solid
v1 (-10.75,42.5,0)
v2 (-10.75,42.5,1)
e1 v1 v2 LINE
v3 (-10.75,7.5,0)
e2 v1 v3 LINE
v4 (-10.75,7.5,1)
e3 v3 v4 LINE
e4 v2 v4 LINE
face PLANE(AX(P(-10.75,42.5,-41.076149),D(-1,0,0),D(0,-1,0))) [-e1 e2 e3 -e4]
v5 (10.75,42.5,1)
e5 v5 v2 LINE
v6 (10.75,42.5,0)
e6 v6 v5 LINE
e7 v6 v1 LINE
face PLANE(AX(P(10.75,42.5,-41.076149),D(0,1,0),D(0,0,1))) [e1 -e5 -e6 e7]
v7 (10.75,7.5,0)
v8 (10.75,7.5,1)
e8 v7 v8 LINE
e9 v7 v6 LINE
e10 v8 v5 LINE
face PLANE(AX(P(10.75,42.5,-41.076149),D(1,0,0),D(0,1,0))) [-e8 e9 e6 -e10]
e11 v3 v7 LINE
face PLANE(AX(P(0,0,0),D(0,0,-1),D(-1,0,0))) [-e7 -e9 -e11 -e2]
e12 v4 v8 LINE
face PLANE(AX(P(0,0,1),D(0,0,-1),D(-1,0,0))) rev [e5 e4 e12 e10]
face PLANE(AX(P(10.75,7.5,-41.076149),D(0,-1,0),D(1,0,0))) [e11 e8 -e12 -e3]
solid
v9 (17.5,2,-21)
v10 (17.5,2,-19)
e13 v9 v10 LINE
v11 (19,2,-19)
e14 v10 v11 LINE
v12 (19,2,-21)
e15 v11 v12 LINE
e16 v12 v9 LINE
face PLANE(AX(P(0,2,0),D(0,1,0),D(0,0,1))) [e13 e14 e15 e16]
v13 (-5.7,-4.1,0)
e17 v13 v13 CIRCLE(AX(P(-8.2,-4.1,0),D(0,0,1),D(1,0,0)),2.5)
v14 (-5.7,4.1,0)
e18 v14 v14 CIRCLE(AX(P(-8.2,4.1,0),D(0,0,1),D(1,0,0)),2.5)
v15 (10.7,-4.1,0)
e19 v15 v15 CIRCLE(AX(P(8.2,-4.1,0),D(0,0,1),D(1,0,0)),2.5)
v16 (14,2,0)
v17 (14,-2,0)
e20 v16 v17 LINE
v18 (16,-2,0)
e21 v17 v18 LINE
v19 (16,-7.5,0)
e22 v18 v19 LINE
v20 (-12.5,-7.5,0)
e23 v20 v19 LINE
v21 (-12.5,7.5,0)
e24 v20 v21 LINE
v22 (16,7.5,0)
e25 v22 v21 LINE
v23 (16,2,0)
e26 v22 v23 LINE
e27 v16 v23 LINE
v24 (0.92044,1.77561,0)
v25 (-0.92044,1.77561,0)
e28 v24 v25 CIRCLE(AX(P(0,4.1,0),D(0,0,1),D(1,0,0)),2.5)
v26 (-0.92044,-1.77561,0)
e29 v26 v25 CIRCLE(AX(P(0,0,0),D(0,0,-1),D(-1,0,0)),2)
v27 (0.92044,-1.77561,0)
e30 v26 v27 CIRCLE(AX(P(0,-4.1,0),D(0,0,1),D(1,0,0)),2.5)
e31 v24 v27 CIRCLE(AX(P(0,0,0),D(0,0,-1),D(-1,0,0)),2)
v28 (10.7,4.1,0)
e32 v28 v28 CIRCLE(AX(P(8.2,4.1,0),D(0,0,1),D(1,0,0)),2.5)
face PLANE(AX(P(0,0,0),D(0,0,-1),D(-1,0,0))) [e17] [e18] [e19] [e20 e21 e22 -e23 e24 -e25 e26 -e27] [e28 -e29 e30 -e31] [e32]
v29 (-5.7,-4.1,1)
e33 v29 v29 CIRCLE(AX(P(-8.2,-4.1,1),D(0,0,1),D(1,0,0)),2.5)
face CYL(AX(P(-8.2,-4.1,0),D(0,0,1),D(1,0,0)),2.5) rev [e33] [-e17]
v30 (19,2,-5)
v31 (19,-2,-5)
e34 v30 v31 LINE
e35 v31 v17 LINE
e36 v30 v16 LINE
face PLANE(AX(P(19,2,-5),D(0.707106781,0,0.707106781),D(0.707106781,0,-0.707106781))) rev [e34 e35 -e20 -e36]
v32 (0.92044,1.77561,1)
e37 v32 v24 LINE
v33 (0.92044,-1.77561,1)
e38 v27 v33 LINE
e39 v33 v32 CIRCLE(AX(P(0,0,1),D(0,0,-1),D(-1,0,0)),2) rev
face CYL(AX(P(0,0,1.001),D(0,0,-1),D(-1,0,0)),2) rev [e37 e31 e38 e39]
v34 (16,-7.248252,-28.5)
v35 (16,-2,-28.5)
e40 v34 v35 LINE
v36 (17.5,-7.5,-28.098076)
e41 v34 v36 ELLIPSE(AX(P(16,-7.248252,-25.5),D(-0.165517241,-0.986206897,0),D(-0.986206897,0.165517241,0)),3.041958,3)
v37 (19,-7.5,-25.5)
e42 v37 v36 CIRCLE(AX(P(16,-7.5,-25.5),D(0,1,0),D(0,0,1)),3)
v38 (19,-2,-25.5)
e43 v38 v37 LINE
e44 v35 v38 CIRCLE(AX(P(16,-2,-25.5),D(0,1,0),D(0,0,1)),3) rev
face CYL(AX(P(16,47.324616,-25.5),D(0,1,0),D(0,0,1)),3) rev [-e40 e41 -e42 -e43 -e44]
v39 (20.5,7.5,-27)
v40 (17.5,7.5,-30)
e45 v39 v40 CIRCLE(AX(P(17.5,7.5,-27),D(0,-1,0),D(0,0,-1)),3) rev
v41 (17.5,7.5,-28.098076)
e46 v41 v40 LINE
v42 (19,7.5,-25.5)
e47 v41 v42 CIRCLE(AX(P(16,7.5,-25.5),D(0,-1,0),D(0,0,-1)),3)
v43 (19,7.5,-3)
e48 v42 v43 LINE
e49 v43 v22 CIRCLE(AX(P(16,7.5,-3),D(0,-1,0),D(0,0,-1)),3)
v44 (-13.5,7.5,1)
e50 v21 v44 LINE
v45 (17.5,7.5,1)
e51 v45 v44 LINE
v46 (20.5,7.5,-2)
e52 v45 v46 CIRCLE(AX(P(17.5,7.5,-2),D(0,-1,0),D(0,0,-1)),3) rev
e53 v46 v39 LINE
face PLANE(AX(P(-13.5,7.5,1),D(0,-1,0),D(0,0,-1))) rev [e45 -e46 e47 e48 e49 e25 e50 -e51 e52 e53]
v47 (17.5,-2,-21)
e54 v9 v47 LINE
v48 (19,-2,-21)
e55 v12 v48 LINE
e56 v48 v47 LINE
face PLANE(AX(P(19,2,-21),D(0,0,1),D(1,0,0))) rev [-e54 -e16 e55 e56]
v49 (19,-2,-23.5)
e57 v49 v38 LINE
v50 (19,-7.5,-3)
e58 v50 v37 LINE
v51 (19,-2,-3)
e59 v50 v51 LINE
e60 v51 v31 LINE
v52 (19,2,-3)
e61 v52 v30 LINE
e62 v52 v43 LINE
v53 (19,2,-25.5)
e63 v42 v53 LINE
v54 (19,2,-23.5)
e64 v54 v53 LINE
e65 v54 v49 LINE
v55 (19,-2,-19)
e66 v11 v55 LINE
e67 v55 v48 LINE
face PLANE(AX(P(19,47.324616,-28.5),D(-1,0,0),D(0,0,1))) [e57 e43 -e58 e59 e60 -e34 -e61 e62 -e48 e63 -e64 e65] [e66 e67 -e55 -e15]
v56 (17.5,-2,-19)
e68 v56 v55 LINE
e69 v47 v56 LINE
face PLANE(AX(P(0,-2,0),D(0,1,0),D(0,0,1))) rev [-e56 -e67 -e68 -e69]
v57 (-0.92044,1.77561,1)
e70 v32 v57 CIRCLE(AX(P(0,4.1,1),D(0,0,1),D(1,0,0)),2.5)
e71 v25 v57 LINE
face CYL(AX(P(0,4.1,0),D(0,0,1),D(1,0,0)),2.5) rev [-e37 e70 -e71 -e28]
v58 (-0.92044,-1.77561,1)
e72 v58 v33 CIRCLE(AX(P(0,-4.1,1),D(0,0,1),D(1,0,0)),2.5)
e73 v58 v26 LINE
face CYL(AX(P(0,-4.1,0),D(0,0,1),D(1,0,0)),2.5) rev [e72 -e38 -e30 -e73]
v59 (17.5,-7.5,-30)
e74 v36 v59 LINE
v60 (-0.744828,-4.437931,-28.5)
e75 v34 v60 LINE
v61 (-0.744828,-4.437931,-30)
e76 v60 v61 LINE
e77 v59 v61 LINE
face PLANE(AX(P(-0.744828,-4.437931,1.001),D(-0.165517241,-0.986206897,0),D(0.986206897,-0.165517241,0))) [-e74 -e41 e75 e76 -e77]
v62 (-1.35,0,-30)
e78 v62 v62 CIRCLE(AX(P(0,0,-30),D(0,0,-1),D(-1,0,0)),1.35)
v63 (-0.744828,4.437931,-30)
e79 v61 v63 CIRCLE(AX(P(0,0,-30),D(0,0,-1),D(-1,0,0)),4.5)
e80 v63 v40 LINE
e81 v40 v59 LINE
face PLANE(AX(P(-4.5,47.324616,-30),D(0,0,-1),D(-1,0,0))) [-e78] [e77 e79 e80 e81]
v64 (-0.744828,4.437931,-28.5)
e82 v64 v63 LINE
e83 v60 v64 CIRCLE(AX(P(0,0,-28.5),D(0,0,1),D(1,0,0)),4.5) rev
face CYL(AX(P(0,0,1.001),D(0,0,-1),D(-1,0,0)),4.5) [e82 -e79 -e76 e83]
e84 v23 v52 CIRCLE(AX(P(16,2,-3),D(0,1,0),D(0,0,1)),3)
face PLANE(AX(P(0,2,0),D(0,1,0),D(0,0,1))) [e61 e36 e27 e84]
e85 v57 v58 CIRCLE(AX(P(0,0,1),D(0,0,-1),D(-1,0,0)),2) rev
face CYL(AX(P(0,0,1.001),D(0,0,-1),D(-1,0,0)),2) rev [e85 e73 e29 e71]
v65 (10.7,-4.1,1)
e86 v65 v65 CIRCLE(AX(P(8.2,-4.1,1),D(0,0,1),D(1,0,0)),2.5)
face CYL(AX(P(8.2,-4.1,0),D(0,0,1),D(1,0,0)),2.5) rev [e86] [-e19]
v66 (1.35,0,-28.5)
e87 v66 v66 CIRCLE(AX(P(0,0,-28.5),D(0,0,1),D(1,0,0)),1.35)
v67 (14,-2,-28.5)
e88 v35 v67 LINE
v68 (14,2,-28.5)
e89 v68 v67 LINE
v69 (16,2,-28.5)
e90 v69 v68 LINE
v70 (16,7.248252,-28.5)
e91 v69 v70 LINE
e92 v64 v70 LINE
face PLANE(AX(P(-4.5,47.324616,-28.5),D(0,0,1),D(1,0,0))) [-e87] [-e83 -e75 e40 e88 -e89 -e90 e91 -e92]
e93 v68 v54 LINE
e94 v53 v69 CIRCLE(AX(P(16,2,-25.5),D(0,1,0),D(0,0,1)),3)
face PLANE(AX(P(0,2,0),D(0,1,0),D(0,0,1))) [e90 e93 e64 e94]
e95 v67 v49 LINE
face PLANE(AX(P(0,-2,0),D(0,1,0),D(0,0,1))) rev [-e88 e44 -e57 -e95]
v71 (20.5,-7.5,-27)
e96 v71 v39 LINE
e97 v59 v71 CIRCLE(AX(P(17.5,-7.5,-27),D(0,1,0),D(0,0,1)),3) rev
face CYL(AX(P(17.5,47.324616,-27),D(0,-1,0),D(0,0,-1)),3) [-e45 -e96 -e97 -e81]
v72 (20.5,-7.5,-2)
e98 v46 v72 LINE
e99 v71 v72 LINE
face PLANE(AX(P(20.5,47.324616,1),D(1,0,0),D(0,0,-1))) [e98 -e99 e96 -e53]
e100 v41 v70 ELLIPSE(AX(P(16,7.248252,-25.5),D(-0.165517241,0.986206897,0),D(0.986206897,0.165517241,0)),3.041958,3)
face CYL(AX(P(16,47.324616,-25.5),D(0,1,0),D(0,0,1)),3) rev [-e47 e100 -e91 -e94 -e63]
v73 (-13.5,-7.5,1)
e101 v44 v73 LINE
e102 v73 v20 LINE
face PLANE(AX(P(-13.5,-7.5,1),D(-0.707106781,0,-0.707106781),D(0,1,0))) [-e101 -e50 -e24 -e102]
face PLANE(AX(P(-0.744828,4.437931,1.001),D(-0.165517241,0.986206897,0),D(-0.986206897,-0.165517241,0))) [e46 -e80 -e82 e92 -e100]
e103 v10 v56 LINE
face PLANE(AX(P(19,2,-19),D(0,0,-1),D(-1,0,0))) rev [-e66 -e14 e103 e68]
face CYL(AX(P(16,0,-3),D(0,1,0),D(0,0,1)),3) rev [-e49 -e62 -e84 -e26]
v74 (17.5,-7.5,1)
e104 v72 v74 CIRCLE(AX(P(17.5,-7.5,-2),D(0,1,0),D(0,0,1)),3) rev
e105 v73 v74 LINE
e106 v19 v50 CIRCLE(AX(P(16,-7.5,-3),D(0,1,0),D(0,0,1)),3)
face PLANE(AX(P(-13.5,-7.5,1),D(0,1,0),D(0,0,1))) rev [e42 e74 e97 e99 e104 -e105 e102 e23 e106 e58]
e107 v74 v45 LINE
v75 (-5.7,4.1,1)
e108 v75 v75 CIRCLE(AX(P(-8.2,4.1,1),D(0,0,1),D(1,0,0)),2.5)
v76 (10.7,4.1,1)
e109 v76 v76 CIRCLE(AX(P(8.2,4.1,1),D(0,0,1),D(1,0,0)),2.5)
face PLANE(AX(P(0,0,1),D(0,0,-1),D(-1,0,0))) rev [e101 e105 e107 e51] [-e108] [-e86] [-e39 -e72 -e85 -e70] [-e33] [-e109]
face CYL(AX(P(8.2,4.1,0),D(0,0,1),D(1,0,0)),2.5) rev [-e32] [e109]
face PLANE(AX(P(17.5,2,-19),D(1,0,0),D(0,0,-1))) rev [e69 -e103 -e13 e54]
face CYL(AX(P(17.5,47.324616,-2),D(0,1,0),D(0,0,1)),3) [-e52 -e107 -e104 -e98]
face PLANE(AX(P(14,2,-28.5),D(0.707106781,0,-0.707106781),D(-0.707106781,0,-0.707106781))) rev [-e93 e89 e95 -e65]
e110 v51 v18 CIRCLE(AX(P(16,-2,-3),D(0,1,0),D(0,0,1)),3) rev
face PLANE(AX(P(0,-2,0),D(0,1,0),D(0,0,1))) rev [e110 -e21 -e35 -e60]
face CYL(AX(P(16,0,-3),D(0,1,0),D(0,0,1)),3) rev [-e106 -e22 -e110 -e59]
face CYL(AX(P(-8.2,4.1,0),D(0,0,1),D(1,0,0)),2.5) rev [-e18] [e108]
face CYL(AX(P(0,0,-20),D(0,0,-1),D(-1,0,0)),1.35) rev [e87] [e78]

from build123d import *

# Parameters (mm, degrees)
SKETCH_1_W          = 27
SKETCH_1_H          = 15
EXTRUDE_1_DEPTH     = 1
SKETCH_2_R          = 2.5
CUT_EXTRUDE_1_DEPTH = 16.475787541
EXTRUDE_2_DEPTH     = 15
SKETCH_6_W          = 1.5
SKETCH_6_H          = 2
EXTRUDE_3_DEPTH     = 2
CHAMFER_1_SIZE      = 1
CUT_EXTRUDE_4_REACH = 39.101
SKETCH_8_R          = 2
SKETCH_9_W          = 21.5
SKETCH_9_H          = 35
EXTRUDE_4_DEPTH     = 1
SKETCH_7_R          = 1.35
CUT_EXTRUDE_5_DEPTH = 10
FILLET_1_R          = 3
CUT_EXTRUDE_START   = -1.901924
CUT_EXTRUDE_6_DEPTH = 1.901924


with BuildPart() as part:
    # 草图1 → 凸台-拉伸1 (new body)
    with BuildSketch(Plane.XY):
        Rectangle(SKETCH_1_W, SKETCH_1_H)
    extrude(amount=EXTRUDE_1_DEPTH)

    # 草图2 → 切除-拉伸1 (cut, through all)
    with BuildSketch(Plane.XY.offset(1)):
        with Locations((0, 4.1)):
            Circle(SKETCH_2_R)
        with Locations((0, -4.1)):
            Circle(SKETCH_2_R)
        with Locations((8.2, 4.1)):
            Circle(SKETCH_2_R)
        with Locations((8.2, -4.1)):
            Circle(SKETCH_2_R)
        with Locations((-8.2, 4.1)):
            Circle(SKETCH_2_R)
        with Locations((-8.2, -4.1)):
            Circle(SKETCH_2_R)
    extrude(amount=-CUT_EXTRUDE_1_DEPTH, mode=Mode.SUBTRACT)

    # 草图3 → 凸台-拉伸2 (add)
    with BuildSketch(Plane.XZ.offset(7.5)):
        Polygon((13.5, 0), (19, 0), (19, -28.5), (-4.5, -28.5), (-4.5, -30), (20.5, -30), (20.5, 1), (13.5, 1), align=None)
    extrude(amount=-EXTRUDE_2_DEPTH)

    # 草图6 → 凸台-拉伸3 (add, symmetric)
    with BuildSketch(Plane(origin=(0, 0, 0), x_dir=(1, 0, 0), z_dir=(0, 1, 0))):
        Polygon((19, 0), (19, 5), (14, 0), align=None)
        Polygon((19, 28.5), (14, 28.5), (19, 23.5), align=None)
        with Locations((18.25, 20)):
            Rectangle(SKETCH_6_W, SKETCH_6_H)
    extrude(amount=EXTRUDE_3_DEPTH, both=True)

    # 倒角1
    chamfer_1_edges = [part.edges().sort_by_distance(p)[0] for p in [
        (-13.5, 0, 0),
    ]]
    chamfer(chamfer_1_edges, length=CHAMFER_1_SIZE - 0.0001)  # a hair under: the kernel refuses the full size

    # 草图8 → 切除-拉伸4 (cut, up to next)
    with BuildSketch(Plane(origin=(0, 0, 0), x_dir=(-1, 0, 0), z_dir=(0, 0, -1)), mode=Mode.PRIVATE) as cut_extrude_4_sk1:
        Circle(SKETCH_8_R)
    cut_extrude_4_tool1 = extrude(cut_extrude_4_sk1.sketch, amount=-CUT_EXTRUDE_4_REACH, mode=Mode.PRIVATE) & part.part
    add(cut_extrude_4_tool1.solids().sort_by_distance((0, 0, 0))[0], mode=Mode.SUBTRACT)

    # 草图7 → 切除-拉伸5 (cut)
    with BuildSketch(Plane(origin=(0, 0, -30), x_dir=(-1, 0, 0), z_dir=(0, 0, -1))):
        Circle(SKETCH_7_R)
    extrude(amount=-CUT_EXTRUDE_5_DEPTH, mode=Mode.SUBTRACT)

    # 圆角1
    fillet_1_edges = [part.edges().sort_by_distance(p)[0] for p in [
        (20.5, 0, 1),
        (20.5, 0, -30),
        (19, 4.75, -28.5),
        (19, 4.75, 0),
        (19, -4.75, 0),
        (19, -4.75, -28.5),
    ]]
    fillet(fillet_1_edges, radius=FILLET_1_R)

    # 草图10 → 切除-拉伸6 (cut)
    with BuildSketch(Plane(origin=(0, 0, -30), x_dir=(-1, 0, 0), z_dir=(0, 0, -1)).offset(CUT_EXTRUDE_START)):
        with BuildLine():
            Line((-17.5, 7.5), (0.744827586, 4.437931034))
            ThreePointArc((0.744827586, 4.437931034), (3.435238284, 2.906740087), (4.5, 0))
            Line((4.5, 0), (4.5, 7.5))
            Line((4.5, 7.5), (-17.5, 7.5))
        make_face()
        with BuildLine():
            Line((4.5, -7.5), (4.5, 0))
            ThreePointArc((4.5, 0), (3.435238284, -2.906740087), (0.744827586, -4.437931034))
            Line((0.744827586, -4.437931034), (-17.5, -7.5))
            Line((-17.5, -7.5), (4.5, -7.5))
        make_face()
    extrude(amount=CUT_EXTRUDE_6_DEPTH, mode=Mode.SUBTRACT)


with BuildPart() as body_2:
    # 草图9 → 凸台-拉伸4 (new body)
    with BuildSketch(Plane.XY.offset(1)):
        with Locations((0, 25)):
            Rectangle(SKETCH_9_W, SKETCH_9_H)
    extrude(amount=-EXTRUDE_4_DEPTH)


solid = Compound([part.part, body_2.part])
